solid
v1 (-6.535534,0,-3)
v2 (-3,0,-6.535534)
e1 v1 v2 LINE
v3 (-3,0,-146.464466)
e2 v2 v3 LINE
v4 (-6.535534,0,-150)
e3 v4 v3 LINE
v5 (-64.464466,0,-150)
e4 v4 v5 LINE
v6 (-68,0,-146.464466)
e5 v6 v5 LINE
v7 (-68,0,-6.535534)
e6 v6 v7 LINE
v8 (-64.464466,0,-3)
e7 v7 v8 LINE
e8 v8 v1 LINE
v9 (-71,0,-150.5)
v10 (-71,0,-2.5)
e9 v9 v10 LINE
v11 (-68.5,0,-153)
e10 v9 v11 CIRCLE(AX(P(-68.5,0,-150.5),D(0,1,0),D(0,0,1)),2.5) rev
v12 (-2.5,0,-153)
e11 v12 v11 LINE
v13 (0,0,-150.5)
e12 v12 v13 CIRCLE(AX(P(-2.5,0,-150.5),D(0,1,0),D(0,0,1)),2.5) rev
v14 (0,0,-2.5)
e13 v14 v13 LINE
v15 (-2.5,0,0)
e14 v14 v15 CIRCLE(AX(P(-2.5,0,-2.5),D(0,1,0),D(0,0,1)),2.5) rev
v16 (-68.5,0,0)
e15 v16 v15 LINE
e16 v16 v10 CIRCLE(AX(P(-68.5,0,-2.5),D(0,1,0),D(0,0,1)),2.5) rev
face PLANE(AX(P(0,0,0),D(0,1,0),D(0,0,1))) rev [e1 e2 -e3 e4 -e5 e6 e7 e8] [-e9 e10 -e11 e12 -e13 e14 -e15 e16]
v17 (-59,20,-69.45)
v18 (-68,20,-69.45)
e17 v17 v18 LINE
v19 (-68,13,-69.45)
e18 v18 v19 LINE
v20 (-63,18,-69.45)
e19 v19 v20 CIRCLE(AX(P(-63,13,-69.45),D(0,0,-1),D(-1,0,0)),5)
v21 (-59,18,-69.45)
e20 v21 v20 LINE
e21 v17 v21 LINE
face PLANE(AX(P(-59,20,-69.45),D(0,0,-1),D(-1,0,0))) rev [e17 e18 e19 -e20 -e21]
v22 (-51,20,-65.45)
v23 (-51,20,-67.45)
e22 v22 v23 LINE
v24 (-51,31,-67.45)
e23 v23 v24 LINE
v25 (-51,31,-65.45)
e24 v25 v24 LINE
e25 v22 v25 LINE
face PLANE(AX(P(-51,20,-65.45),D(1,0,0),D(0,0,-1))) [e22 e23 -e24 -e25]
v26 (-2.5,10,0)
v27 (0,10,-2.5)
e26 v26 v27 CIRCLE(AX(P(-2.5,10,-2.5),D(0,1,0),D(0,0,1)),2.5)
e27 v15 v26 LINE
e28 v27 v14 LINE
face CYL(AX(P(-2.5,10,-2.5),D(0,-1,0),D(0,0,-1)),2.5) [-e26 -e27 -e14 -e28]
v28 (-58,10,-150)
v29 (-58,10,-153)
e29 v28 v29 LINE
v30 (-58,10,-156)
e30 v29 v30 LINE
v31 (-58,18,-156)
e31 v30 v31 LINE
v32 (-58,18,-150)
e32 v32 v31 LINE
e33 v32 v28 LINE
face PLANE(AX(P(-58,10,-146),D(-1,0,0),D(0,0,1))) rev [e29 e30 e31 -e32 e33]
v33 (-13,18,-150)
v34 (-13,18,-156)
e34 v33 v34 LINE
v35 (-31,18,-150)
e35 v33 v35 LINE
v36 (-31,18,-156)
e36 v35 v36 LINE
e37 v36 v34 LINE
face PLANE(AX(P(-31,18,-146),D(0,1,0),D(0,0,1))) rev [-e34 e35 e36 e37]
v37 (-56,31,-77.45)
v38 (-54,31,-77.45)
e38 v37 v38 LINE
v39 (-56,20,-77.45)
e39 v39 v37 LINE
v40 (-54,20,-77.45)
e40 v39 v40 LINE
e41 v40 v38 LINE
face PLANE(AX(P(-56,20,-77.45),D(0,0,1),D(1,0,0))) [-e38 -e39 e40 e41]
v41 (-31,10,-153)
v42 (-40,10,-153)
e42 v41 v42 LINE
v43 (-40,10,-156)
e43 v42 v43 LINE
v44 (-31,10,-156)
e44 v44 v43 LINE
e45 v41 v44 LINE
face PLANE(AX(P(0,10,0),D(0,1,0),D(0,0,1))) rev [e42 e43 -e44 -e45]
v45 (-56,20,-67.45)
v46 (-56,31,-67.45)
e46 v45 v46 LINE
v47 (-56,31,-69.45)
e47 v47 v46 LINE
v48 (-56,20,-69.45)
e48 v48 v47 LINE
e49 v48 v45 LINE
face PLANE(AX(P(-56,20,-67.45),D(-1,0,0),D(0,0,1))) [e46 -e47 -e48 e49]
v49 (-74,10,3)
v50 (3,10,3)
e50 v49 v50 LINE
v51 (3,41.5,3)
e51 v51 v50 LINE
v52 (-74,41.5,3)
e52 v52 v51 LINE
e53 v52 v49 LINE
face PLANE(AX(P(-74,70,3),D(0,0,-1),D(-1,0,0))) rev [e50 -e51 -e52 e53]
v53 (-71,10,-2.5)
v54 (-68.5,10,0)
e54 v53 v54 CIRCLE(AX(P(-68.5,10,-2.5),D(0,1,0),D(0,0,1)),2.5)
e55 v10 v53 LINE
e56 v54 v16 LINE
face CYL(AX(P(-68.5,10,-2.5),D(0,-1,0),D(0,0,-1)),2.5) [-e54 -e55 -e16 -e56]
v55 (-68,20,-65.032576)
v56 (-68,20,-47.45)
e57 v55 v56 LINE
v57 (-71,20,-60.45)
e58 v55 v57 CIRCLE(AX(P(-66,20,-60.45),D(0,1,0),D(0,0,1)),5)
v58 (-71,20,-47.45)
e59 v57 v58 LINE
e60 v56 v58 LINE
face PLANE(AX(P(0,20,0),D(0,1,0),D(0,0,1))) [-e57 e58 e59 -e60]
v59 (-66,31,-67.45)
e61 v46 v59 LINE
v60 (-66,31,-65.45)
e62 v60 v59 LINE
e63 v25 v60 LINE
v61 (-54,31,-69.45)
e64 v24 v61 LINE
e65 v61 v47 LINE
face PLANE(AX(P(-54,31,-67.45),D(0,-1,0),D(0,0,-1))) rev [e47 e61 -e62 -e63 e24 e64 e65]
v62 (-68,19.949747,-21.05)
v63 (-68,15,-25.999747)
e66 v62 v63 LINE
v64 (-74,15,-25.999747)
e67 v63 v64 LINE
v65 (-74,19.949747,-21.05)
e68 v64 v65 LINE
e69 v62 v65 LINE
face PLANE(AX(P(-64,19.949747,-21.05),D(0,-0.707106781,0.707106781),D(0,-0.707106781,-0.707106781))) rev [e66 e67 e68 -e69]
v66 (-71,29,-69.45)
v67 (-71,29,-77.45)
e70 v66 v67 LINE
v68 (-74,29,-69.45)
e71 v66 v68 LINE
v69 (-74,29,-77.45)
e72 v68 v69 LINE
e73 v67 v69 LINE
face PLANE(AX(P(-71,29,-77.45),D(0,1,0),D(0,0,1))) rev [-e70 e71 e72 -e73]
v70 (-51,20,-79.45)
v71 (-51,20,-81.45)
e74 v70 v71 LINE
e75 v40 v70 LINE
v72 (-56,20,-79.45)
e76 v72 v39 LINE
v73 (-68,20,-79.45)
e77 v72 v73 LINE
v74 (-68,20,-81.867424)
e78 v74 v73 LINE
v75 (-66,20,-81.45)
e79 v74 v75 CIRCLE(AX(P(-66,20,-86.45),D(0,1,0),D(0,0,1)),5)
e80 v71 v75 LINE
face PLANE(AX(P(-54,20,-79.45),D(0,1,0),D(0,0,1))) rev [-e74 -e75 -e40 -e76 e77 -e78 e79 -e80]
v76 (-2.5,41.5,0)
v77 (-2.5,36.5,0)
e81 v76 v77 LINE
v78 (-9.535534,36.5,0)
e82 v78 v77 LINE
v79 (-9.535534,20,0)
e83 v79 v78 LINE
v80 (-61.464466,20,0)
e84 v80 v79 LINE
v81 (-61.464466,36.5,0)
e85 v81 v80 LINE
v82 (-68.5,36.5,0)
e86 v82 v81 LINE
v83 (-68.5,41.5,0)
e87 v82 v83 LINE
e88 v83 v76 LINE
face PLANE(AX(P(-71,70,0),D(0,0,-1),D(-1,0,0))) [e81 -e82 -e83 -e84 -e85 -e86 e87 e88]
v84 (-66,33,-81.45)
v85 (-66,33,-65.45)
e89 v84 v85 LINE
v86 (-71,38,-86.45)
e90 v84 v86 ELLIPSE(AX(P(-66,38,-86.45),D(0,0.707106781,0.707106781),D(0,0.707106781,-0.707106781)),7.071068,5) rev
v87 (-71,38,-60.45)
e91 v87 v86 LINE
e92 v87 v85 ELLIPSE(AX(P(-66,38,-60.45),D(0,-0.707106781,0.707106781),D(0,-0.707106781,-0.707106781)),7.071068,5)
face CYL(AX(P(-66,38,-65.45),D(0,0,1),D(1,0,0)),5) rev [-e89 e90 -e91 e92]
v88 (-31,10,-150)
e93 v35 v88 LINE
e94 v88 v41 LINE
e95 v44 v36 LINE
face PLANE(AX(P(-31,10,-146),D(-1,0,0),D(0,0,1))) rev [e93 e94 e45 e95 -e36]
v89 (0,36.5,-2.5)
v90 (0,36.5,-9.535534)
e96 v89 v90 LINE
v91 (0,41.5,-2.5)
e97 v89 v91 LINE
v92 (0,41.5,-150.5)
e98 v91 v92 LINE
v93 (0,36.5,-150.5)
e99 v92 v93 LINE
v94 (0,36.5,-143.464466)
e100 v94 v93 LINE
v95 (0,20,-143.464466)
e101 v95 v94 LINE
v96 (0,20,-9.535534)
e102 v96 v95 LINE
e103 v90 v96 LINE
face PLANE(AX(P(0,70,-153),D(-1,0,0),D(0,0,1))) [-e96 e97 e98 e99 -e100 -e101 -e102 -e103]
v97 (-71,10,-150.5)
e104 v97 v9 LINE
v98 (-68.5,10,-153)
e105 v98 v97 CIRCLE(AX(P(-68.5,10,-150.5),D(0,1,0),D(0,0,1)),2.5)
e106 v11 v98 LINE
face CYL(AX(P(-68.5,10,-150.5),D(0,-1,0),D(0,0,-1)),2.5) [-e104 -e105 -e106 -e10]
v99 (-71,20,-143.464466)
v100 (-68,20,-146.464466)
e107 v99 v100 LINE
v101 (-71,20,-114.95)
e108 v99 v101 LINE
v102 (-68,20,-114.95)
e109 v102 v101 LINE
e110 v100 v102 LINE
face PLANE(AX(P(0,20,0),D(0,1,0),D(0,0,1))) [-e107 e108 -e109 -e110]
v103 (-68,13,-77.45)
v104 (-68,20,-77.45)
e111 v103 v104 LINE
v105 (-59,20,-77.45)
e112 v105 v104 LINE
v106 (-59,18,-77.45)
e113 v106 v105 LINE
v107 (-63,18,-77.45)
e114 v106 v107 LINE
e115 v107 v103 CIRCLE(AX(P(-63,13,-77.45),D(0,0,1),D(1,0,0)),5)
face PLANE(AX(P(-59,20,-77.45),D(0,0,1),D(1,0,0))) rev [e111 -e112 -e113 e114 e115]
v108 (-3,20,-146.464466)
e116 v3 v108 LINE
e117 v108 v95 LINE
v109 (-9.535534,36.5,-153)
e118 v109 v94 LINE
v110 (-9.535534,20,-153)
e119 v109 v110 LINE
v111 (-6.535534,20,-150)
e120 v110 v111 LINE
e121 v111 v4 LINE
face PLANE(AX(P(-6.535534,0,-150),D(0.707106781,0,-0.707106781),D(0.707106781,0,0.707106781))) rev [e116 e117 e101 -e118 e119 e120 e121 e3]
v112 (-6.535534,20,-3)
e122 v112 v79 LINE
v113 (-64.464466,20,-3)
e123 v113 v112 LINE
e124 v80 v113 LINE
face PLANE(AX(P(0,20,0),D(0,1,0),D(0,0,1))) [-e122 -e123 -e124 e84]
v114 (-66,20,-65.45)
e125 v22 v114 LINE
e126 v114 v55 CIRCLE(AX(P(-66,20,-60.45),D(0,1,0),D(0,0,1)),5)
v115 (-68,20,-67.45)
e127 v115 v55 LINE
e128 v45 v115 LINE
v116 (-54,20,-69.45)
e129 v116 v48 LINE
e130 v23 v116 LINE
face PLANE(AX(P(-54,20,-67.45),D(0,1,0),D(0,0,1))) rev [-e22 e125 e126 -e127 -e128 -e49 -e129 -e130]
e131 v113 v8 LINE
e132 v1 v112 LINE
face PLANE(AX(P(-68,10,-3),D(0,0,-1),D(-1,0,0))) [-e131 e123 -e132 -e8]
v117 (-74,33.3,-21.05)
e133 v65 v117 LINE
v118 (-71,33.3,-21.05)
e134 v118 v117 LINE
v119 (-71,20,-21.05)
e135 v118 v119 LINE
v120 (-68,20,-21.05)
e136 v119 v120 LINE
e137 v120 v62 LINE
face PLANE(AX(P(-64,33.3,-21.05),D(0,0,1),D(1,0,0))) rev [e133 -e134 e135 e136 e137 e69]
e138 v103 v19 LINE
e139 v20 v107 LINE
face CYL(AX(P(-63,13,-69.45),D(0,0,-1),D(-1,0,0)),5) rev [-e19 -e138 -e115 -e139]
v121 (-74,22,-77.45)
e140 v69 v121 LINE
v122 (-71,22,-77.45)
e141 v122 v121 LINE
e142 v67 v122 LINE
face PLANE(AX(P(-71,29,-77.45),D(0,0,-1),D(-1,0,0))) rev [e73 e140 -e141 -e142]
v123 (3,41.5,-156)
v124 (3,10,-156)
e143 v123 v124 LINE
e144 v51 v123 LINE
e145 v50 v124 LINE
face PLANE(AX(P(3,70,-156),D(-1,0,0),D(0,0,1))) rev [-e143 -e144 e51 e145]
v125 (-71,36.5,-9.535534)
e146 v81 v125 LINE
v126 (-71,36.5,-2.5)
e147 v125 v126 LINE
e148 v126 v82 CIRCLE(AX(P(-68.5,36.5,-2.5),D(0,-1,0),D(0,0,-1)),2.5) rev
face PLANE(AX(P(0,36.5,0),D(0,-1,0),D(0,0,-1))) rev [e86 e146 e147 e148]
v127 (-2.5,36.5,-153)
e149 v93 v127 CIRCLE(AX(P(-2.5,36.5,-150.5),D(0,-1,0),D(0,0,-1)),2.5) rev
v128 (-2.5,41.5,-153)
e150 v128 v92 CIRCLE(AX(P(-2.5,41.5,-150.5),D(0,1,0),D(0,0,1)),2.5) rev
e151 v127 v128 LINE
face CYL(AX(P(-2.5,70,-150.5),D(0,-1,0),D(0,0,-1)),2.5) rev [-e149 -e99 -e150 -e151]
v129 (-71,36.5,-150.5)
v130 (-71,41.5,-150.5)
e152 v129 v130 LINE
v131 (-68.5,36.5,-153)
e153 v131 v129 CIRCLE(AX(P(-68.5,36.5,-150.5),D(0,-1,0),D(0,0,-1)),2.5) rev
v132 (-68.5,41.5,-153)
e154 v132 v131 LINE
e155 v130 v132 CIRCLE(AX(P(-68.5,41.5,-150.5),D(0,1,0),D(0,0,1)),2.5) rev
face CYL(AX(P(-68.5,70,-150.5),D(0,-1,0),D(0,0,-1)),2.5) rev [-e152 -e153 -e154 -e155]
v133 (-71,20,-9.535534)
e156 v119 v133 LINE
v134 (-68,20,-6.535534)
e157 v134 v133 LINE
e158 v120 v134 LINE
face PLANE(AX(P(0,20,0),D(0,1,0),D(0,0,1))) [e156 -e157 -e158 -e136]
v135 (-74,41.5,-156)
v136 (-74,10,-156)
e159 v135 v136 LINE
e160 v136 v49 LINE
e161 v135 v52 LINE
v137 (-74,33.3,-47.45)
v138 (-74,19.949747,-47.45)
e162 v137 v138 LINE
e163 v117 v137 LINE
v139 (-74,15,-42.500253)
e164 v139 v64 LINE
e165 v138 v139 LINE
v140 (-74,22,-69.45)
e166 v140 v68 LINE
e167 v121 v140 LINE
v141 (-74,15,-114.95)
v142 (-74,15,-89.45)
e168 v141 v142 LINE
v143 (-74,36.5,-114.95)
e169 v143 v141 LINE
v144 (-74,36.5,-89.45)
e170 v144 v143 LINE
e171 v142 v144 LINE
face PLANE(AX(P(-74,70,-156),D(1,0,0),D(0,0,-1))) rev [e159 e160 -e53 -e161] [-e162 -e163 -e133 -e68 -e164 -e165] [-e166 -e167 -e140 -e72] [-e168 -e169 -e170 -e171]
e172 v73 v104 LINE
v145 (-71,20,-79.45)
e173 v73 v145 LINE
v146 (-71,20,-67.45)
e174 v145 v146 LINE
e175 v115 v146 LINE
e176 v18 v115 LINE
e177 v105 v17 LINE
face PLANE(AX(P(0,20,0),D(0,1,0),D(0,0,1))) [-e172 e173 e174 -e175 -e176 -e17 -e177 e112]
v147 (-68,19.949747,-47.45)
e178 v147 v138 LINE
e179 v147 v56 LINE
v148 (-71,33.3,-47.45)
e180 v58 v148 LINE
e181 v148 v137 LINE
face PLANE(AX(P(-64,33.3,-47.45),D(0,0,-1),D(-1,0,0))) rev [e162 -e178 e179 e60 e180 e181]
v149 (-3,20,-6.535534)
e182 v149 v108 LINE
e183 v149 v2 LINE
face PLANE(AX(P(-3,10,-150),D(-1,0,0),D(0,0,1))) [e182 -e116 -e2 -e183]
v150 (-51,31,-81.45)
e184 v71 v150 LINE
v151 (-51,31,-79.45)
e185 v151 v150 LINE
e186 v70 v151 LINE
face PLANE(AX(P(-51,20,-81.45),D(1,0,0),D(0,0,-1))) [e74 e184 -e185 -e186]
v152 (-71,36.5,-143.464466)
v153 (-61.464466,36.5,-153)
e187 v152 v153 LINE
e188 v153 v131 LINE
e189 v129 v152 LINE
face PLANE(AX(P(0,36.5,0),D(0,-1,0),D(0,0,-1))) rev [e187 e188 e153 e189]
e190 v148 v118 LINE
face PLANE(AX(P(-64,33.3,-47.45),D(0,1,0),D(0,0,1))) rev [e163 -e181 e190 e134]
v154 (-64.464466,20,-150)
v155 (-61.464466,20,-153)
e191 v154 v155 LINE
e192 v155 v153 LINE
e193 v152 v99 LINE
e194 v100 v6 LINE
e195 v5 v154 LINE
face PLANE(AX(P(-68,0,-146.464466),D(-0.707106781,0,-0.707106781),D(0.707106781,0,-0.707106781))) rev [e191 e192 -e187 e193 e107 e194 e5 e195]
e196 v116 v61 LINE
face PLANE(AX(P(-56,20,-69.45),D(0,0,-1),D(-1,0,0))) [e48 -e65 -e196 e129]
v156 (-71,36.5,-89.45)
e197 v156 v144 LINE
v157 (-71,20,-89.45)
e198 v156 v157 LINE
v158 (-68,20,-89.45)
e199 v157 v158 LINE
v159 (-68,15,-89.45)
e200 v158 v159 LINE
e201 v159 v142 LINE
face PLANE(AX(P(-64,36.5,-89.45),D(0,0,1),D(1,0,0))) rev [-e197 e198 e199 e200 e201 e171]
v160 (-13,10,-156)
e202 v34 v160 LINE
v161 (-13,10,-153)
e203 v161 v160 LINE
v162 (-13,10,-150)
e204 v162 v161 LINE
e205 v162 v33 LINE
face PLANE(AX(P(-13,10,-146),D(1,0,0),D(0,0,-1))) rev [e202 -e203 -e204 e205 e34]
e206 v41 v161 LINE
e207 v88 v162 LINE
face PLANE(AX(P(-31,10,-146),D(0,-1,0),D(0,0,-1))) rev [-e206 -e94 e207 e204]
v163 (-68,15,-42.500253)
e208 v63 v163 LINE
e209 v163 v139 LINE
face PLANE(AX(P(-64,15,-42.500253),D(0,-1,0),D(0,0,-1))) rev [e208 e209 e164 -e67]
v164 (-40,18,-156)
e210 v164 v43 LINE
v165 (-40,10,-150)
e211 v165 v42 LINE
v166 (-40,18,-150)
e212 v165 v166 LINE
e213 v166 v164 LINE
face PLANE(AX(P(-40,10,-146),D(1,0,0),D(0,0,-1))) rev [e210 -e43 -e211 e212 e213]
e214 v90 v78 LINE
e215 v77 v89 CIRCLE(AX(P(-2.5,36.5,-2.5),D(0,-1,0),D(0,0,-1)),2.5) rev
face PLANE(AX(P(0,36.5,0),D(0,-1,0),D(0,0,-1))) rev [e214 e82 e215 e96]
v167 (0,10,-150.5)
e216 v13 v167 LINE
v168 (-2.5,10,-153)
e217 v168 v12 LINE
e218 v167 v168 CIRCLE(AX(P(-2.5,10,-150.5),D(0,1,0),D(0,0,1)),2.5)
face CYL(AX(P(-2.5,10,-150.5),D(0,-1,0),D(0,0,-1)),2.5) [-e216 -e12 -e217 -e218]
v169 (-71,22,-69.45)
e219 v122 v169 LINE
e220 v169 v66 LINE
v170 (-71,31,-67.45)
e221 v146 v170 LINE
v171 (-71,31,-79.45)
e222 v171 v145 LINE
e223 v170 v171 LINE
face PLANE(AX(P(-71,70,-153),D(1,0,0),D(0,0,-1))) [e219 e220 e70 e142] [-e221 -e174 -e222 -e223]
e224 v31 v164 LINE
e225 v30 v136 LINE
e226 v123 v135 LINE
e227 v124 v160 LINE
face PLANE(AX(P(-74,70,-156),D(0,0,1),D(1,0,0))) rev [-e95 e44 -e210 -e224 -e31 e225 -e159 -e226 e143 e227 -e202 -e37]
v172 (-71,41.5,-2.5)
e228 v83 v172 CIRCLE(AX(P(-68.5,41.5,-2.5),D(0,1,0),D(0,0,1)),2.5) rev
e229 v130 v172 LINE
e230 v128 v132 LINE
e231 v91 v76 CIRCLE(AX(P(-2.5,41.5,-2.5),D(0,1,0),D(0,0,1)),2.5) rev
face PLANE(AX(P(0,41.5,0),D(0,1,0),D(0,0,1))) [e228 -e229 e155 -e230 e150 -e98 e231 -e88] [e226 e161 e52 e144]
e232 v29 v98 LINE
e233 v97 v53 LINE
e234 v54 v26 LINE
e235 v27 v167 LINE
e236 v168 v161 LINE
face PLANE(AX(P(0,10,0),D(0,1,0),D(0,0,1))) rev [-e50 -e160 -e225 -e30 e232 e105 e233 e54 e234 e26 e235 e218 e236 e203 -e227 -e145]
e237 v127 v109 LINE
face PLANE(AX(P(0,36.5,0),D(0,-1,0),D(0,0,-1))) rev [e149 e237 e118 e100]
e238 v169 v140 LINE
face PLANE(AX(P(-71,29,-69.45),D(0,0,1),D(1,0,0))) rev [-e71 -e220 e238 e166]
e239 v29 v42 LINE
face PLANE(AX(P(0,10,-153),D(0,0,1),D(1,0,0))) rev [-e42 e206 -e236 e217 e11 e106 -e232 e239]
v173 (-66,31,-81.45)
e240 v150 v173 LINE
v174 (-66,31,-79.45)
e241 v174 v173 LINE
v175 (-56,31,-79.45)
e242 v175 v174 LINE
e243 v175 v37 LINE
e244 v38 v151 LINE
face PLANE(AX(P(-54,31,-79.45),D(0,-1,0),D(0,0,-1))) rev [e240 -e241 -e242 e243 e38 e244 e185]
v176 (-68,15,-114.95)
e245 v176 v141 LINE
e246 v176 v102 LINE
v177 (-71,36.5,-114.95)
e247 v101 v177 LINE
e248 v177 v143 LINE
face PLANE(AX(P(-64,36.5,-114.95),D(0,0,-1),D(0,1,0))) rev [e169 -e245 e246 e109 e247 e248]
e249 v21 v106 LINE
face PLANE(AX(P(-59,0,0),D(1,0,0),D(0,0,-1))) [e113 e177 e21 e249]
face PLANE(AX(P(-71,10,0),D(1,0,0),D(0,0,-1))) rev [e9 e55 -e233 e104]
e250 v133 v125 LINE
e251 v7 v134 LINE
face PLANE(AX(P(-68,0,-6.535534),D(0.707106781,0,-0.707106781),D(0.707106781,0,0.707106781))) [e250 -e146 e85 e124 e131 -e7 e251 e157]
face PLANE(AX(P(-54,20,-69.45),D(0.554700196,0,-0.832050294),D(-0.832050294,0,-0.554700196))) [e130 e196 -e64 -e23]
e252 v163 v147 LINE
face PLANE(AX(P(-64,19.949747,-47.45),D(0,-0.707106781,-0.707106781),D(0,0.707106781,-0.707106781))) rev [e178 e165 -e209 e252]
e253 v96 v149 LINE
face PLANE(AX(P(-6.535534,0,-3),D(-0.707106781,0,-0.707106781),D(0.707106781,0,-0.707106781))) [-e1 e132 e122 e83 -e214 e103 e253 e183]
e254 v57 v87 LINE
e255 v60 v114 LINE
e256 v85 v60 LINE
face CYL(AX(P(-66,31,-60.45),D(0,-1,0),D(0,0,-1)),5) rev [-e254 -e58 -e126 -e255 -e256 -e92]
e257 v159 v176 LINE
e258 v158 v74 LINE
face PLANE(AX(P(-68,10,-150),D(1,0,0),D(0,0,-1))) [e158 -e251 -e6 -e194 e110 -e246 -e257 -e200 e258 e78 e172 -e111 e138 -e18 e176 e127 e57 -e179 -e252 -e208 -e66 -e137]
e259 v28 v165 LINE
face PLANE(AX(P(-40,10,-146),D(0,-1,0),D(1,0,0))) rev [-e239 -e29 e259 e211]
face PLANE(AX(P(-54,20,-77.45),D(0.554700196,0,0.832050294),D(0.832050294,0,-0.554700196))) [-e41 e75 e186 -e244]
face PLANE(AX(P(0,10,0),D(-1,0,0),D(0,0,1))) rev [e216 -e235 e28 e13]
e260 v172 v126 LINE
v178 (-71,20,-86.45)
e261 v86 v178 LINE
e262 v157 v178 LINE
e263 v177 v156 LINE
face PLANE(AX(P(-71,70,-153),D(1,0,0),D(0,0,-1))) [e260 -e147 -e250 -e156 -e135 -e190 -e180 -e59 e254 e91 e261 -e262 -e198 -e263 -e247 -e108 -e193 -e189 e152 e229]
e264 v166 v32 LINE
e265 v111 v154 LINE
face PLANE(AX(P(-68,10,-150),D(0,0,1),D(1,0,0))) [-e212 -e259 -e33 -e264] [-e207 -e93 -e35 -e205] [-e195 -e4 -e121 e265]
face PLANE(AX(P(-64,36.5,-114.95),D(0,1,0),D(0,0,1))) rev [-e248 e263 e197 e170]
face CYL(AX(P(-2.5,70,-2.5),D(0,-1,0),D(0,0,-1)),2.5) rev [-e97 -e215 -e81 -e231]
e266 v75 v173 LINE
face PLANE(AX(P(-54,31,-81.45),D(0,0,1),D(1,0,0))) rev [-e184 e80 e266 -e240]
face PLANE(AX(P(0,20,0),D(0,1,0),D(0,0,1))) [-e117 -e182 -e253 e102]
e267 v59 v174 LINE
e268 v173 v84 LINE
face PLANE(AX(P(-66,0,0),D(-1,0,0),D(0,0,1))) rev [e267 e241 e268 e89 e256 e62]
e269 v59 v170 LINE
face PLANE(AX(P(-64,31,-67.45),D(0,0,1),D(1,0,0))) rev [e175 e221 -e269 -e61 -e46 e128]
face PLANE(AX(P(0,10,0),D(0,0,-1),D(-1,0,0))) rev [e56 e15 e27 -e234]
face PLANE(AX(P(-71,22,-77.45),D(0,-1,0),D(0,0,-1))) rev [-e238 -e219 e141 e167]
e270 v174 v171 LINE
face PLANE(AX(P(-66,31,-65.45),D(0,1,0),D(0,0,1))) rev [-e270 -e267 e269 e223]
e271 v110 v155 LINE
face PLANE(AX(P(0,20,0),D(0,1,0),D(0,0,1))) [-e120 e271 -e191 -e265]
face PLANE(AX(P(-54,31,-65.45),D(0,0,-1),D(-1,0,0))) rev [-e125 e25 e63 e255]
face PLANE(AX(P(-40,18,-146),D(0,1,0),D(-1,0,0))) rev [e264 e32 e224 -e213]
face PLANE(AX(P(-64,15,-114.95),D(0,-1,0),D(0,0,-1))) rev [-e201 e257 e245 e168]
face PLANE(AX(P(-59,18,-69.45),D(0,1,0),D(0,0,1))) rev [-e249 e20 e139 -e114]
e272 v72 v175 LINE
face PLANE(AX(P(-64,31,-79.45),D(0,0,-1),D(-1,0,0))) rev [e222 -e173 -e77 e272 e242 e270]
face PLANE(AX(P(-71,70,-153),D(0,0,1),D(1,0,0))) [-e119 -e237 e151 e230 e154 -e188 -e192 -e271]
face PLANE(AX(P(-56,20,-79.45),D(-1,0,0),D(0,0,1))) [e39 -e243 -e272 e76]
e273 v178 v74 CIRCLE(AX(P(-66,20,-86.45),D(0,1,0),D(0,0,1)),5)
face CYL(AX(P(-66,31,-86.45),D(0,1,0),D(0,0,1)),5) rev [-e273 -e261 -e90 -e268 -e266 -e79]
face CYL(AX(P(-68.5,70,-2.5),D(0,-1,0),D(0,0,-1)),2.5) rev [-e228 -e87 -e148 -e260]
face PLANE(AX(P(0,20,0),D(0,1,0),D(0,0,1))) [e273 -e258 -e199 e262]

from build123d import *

# Parameters (mm, degrees)
SKETCH1_W           = 71
SKETCH1_H           = 153
SKETCH1_W_2         = 65
SKETCH1_H_2         = 147
BOSS_EXTRUDE1_DEPTH = 10
SKETCH2_W           = 77
SKETCH2_H           = 159
SKETCH2_W_2         = 71
SKETCH2_H_2         = 153
BOSS_EXTRUDE2_DEPTH = 60
SKETCH3_W           = 71
SKETCH3_H           = 153
SKETCH3_W_2         = 65
SKETCH3_H_2         = 147
BOSS_EXTRUDE3_DEPTH = 10
RIB17_REACH         = 188.312
SKETCH7_WALL_W      = 379.62313401
SKETCH7_WALL_H      = 60
RIB22_REACH         = 188.312
SKETCH9_WALL_W      = 379.62313401
SKETCH9_WALL_H      = 60
RIB23_REACH         = 188.312
SKETCH10_WALL_W     = 379.62313401
SKETCH10_WALL_H     = 60
RIB24_REACH         = 188.312
SKETCH11_WALL_W     = 379.62313401
SKETCH11_WALL_H     = 60
FILLET1_R           = 2.5
FILLET2_R           = 3
SKETCH12_W          = 18
SKETCH12_H          = 8
CUT_EXTRUDE1_DEPTH  = 10
SKETCH13_W          = 12
SKETCH13_H          = 11
SKETCH13_W_2        = 25.5
SKETCH13_H_2        = 21.5
CUT_EXTRUDE2_DEPTH  = 10
SKETCH14_W          = 77
SKETCH14_H          = 159
CUT_EXTRUDE3_DEPTH  = 28.5
SKETCH15_W          = 71
SKETCH15_H          = 153
CUT_EXTRUDE4_DEPTH  = 5
FILLET3_R           = 2.5
SKETCH16_W          = 2
SKETCH16_H          = 11
BOSS_EXTRUDE4_DEPTH = 17
BOSS_EXTRUDE5_DEPTH = 11
SKETCH19_W          = 8
SKETCH19_H          = 2
BOSS_EXTRUDE7_DEPTH = 9
SKETCH20_W          = 8
SKETCH20_H          = 7
BOSS_EXTRUDE8_DEPTH = 3
SKETCH21_W          = 16
SKETCH21_H          = 2
BOSS_EXTRUDE9_DEPTH = 5
FILLET4_R           = 5


with BuildPart() as part:
    # Sketch1 → Boss-Extrude1 (new body)
    with BuildSketch(Plane(origin=(0, 0, 0), x_dir=(1, 0, 0), z_dir=(0, 1, 0))):
        with Locations((-35.5, 76.5)):
            Rectangle(SKETCH1_W, SKETCH1_H)
        with Locations((-35.5, 76.5)):
            Rectangle(SKETCH1_W_2, SKETCH1_H_2, mode=Mode.SUBTRACT)
    extrude(amount=BOSS_EXTRUDE1_DEPTH)



with BuildPart() as body_2:
    # Sketch2 → Boss-Extrude2 (new body)
    with BuildSketch(Plane(origin=(0, 10, 0), x_dir=(1, 0, 0), z_dir=(0, 1, 0))):
        with Locations((-35.5, 76.5)):
            Rectangle(SKETCH2_W, SKETCH2_H)
        with Locations((-35.5, 76.5)):
            Rectangle(SKETCH2_W_2, SKETCH2_H_2, mode=Mode.SUBTRACT)
    extrude(amount=BOSS_EXTRUDE2_DEPTH)


with BuildPart() as part_1:
    add(part.part)

    add(body_2.part)  # Boss-Extrude3 merges body 2
    # Sketch3 → Boss-Extrude3 (add)
    with BuildSketch(Plane(origin=(0, 10, 0), x_dir=(1, 0, 0), z_dir=(0, 1, 0))):
        with Locations((-35.5, 76.5)):
            Rectangle(SKETCH3_W, SKETCH3_H)
        with Locations((-35.5, 76.5)):
            Rectangle(SKETCH3_W_2, SKETCH3_H_2, mode=Mode.SUBTRACT)
    extrude(amount=BOSS_EXTRUDE3_DEPTH)

    # Sketch7 wall → Rib17 (add, up to next)
    with BuildSketch(Plane(origin=(-66.232233047, 0, -4.767766953), x_dir=(0.707106781187, 0, 0.707106781187), z_dir=(-0.707106781187, 0, 0.707106781187)), mode=Mode.PRIVATE) as rib17_sk1:
        with Locations((0, 30)):
            Rectangle(SKETCH7_WALL_W, SKETCH7_WALL_H)
    rib17_tool1 = extrude(rib17_sk1.sketch, amount=RIB17_REACH, mode=Mode.PRIVATE) - part_1.part
    add(rib17_tool1.solids().sort_by_distance((-66.232233047, 0, -4.767766953))[0])

    # Sketch9 wall → Rib22 (add, up to next)
    with BuildSketch(Plane(origin=(-66.232233047, 0, -148.232233047), x_dir=(0.707106781187, 0, -0.707106781187), z_dir=(0.707106781187, 0, 0.707106781187)), mode=Mode.PRIVATE) as rib22_sk1:
        with Locations((0, 30)):
            Rectangle(SKETCH9_WALL_W, SKETCH9_WALL_H)
    rib22_tool1 = extrude(rib22_sk1.sketch, amount=-RIB22_REACH, mode=Mode.PRIVATE) - part_1.part
    add(rib22_tool1.solids().sort_by_distance((-66.232233047, 0, -148.232233047))[0])

    # Sketch10 wall → Rib23 (add, up to next)
    with BuildSketch(Plane(origin=(-4.767766953, 0, -148.232233047), x_dir=(0.707106781187, 0, 0.707106781187), z_dir=(-0.707106781187, 0, 0.707106781187)), mode=Mode.PRIVATE) as rib23_sk1:
        with Locations((0, 30)):
            Rectangle(SKETCH10_WALL_W, SKETCH10_WALL_H)
    rib23_tool1 = extrude(rib23_sk1.sketch, amount=-RIB23_REACH, mode=Mode.PRIVATE) - part_1.part
    add(rib23_tool1.solids().sort_by_distance((-4.767766953, 0, -148.232233047))[0])

    # Sketch11 wall → Rib24 (add, up to next)
    with BuildSketch(Plane(origin=(-4.767766953, 0, -4.767766953), x_dir=(0.707106781187, 0, -0.707106781187), z_dir=(0.707106781187, 0, 0.707106781187)), mode=Mode.PRIVATE) as rib24_sk1:
        with Locations((0, 30)):
            Rectangle(SKETCH11_WALL_W, SKETCH11_WALL_H)
    rib24_tool1 = extrude(rib24_sk1.sketch, amount=RIB24_REACH, mode=Mode.PRIVATE) - part_1.part
    add(rib24_tool1.solids().sort_by_distance((-4.767766953, 0, -4.767766953))[0])

    # Fillet1
    fillet1_edges = [part_1.edges().sort_by_distance(p)[0] for p in [
        (0, 5, 0),
        (-71, 5, 0),
        (-71, 5, -153),
        (0, 5, -153),
    ]]
    fillet(fillet1_edges, radius=FILLET1_R)

    # Fillet2
    fillet2_edges = [part_1.edges().sort_by_distance(p)[0] for p in [
        (-71, 65, 0),
        (0, 65, 0),
        (0, 65, -153),
        (-71, 65, -153),
    ]]
    fillet(fillet2_edges, radius=FILLET2_R)

    # Sketch12 → Cut-Extrude1 (cut)
    with BuildSketch(Plane(origin=(0, 0, -156), x_dir=(-1, 0, 0), z_dir=(0, 0, -1))):
        with Locations((22, 14)):
            Rectangle(SKETCH12_W, SKETCH12_H)
        with Locations((49, 14)):
            Rectangle(SKETCH12_W, SKETCH12_H)
    extrude(amount=-CUT_EXTRUDE1_DEPTH, mode=Mode.SUBTRACT)

    # Sketch13 → Cut-Extrude2 (cut)
    with BuildSketch(Plane.ZY.offset(74)):
        Polygon((-47.45, 19.949747468), (-42.500252532, 15), (-25.999747468, 15), (-21.05, 19.949747468), (-21.05, 33.3), (-47.45, 33.3), align=None)
        with Locations((-73.45, 25.5)):
            Rectangle(SKETCH13_W, SKETCH13_H)
        with Locations((-102.2, 25.75)):
            Rectangle(SKETCH13_W_2, SKETCH13_H_2)
    extrude(amount=-CUT_EXTRUDE2_DEPTH, mode=Mode.SUBTRACT)

    # Sketch14 → Cut-Extrude3 (cut)
    with BuildSketch(Plane(origin=(0, 70, 0), x_dir=(1, 0, 0), z_dir=(0, 1, 0))):
        with Locations((-35.5, 76.5)):
            Rectangle(SKETCH14_W, SKETCH14_H)
    extrude(amount=-CUT_EXTRUDE3_DEPTH, mode=Mode.SUBTRACT)

    # Sketch15 → Cut-Extrude4 (cut)
    with BuildSketch(Plane(origin=(0, 41.5, 0), x_dir=(1, 0, 0), z_dir=(0, 1, 0))):
        with Locations((-35.5, 76.5)):
            Rectangle(SKETCH15_W, SKETCH15_H)
    extrude(amount=-CUT_EXTRUDE4_DEPTH, mode=Mode.SUBTRACT)

    # Fillet3
    fillet3_edges = [part_1.edges().sort_by_distance(p)[0] for p in [
        (-71, 39, 0),
        (-71, 39, -153),
        (0, 39, -153),
        (0, 39, 0),
    ]]
    fillet(fillet3_edges, radius=FILLET3_R)

    # Sketch16 → Boss-Extrude4 (add)
    with BuildSketch(Plane(origin=(-71, 0, 0), x_dir=(0, 0, -1), z_dir=(1, 0, 0))):
        with Locations((66.45, 25.5)):
            Rectangle(SKETCH16_W, SKETCH16_H)
        with Locations((80.45, 25.5)):
            Rectangle(SKETCH16_W, SKETCH16_H)
    extrude(amount=BOSS_EXTRUDE4_DEPTH)

    # Sketch17 → Boss-Extrude5 (add)
    with BuildSketch(Plane(origin=(0, 31, 0), x_dir=(1, 0, 0), z_dir=(0, 1, 0))):
        Polygon((-54, 79.45), (-56, 79.45), (-56, 77.45), (-54, 77.45), (-51, 79.45), (-51, 81.45), (-54, 81.45), align=None)
        Polygon((-56, 67.45), (-56, 69.45), (-54, 69.45), (-51, 67.45), (-51, 65.45), (-54, 65.45), (-54, 67.45), align=None)
    extrude(amount=-BOSS_EXTRUDE5_DEPTH)

    # Sketch19 → Boss-Extrude7 (add)
    with BuildSketch(Plane(origin=(-68, 0, 0), x_dir=(0, 0, -1), z_dir=(1, 0, 0))):
        with Locations((73.45, 19)):
            Rectangle(SKETCH19_W, SKETCH19_H)
    extrude(amount=BOSS_EXTRUDE7_DEPTH)

    # Sketch20 → Boss-Extrude8 (add)
    with BuildSketch(Plane.ZY.offset(74)):
        Polygon((-79.45, 31), (-77.45, 31), (-69.45, 31), (-67.45, 31), (-67.45, 20), (-69.45, 20), (-77.45, 20), (-79.45, 20), align=None)
        with Locations((-73.45, 25.5)):
            Rectangle(SKETCH20_W, SKETCH20_H, mode=Mode.SUBTRACT)
    extrude(amount=-BOSS_EXTRUDE8_DEPTH)

    # Sketch21 → Boss-Extrude9 (add)
    with BuildSketch(Plane(origin=(-71, 0, 0), x_dir=(0, 0, -1), z_dir=(1, 0, 0))):
        with Locations((73.45, 32)):
            Rectangle(SKETCH21_W, SKETCH21_H)
    extrude(amount=BOSS_EXTRUDE9_DEPTH)

    # Fillet4
    # the kernel refuses this fillet: 5 mm, written as the material it adds along each edge
    with BuildSketch(Plane(origin=(-68, 18, -77.45), x_dir=(0, -1, 0), z_dir=(0, 0, 1))) as fillet4_piece_1:
        with BuildLine():
            CenterArc((FILLET4_R, FILLET4_R), FILLET4_R, 180, 90)
            Line((0, FILLET4_R), (-FILLET4_R * 0.02, FILLET4_R))
            Line((-FILLET4_R * 0.02, FILLET4_R), (-FILLET4_R * 0.02, -FILLET4_R * 0.02))
            Line((-FILLET4_R * 0.02, -FILLET4_R * 0.02), (FILLET4_R, -FILLET4_R * 0.02))
            Line((FILLET4_R, -FILLET4_R * 0.02), (FILLET4_R, 0))
        make_face()
    extrude(amount=8)
    with BuildSketch(Plane(origin=(-71, 33, -81.45), x_dir=(0, 1, 0), z_dir=(0, 0, 1))) as fillet4_piece_2:
        with BuildLine():
            CenterArc((FILLET4_R, -FILLET4_R), FILLET4_R, 90, 90)
            Line((0, -FILLET4_R), (-FILLET4_R * 0.02, -FILLET4_R))
            Line((-FILLET4_R * 0.02, -FILLET4_R), (-FILLET4_R * 0.02, FILLET4_R * 0.02))
            Line((-FILLET4_R * 0.02, FILLET4_R * 0.02), (FILLET4_R, FILLET4_R * 0.02))
            Line((FILLET4_R, FILLET4_R * 0.02), (FILLET4_R, 0))
        make_face()
    extrude(amount=16)
    with BuildSketch(Plane(origin=(-71, 33, -81.45), x_dir=(0, 0, -1), z_dir=(0, -1, 0)), Plane(origin=(-71, 20, -65.45), x_dir=(0, 0, 1), z_dir=(0, 1, 0))) as fillet4_piece_3:
        with BuildLine():
            CenterArc((FILLET4_R, FILLET4_R), FILLET4_R, 180, 90)
            Line((0, FILLET4_R), (-FILLET4_R * 0.02, FILLET4_R))
            Line((-FILLET4_R * 0.02, FILLET4_R), (-FILLET4_R * 0.02, -FILLET4_R * 0.02))
            Line((-FILLET4_R * 0.02, -FILLET4_R * 0.02), (FILLET4_R, -FILLET4_R * 0.02))
            Line((FILLET4_R, -FILLET4_R * 0.02), (FILLET4_R, 0))
        make_face()
    extrude(amount=13)
    with BuildSketch(Plane(origin=(-71, 45.5, -81.45), x_dir=(0, 0, -1), z_dir=(0, -1, 0))) as fillet4_piece_4a_section:
        with BuildLine():
            CenterArc((FILLET4_R, FILLET4_R), FILLET4_R, 180, 90)
            Line((0, FILLET4_R), (-FILLET4_R * 0.02, FILLET4_R))
            Line((-FILLET4_R * 0.02, FILLET4_R), (-FILLET4_R * 0.02, -FILLET4_R * 0.02))
            Line((-FILLET4_R * 0.02, -FILLET4_R * 0.02), (FILLET4_R, -FILLET4_R * 0.02))
            Line((FILLET4_R, -FILLET4_R * 0.02), (FILLET4_R, 0))
        make_face()
    fillet4_piece_4a = extrude(amount=25.5, mode=Mode.PRIVATE)
    fillet4_piece_4a = split(fillet4_piece_4a, bisect_by=Plane(origin=(-69.868024429, 33, -82.581975571), z_dir=(0, 1, 0)), keep=Keep.TOP, mode=Mode.PRIVATE)
    with BuildSketch(Plane(origin=(-71, 33, -93.95), x_dir=(0, 1, 0), z_dir=(0, 0, 1))) as fillet4_piece_4b_section:
        with BuildLine():
            CenterArc((FILLET4_R, -FILLET4_R), FILLET4_R, 90, 90)
            Line((0, -FILLET4_R), (-FILLET4_R * 0.02, -FILLET4_R))
            Line((-FILLET4_R * 0.02, -FILLET4_R), (-FILLET4_R * 0.02, FILLET4_R * 0.02))
            Line((-FILLET4_R * 0.02, FILLET4_R * 0.02), (FILLET4_R, FILLET4_R * 0.02))
            Line((FILLET4_R, FILLET4_R * 0.02), (FILLET4_R, 0))
        make_face()
    fillet4_piece_4b = extrude(amount=28.5, mode=Mode.PRIVATE)
    fillet4_piece_4b = split(fillet4_piece_4b, bisect_by=Plane(origin=(-69.868024429, 34.131975571, -81.45), z_dir=(0, 0, -1)), keep=Keep.TOP, mode=Mode.PRIVATE)
    fillet4_piece_4 = fillet4_piece_4a & fillet4_piece_4b
    add(fillet4_piece_4)
    with BuildSketch(Plane(origin=(-71, 33, -81.45), x_dir=(0, 1, 0), z_dir=(0, 0, 1))) as fillet4_piece_5a_section:
        with BuildLine():
            CenterArc((FILLET4_R, -FILLET4_R), FILLET4_R, 90, 90)
            Line((0, -FILLET4_R), (-FILLET4_R * 0.02, -FILLET4_R))
            Line((-FILLET4_R * 0.02, -FILLET4_R), (-FILLET4_R * 0.02, FILLET4_R * 0.02))
            Line((-FILLET4_R * 0.02, FILLET4_R * 0.02), (FILLET4_R, FILLET4_R * 0.02))
            Line((FILLET4_R, FILLET4_R * 0.02), (FILLET4_R, 0))
        make_face()
    fillet4_piece_5a = extrude(amount=28.5, mode=Mode.PRIVATE)
    fillet4_piece_5a = split(fillet4_piece_5a, bisect_by=Plane(origin=(-69.868024429, 34.131975571, -65.45), z_dir=(0, 0, 1)), keep=Keep.TOP, mode=Mode.PRIVATE)
    with BuildSketch(Plane(origin=(-71, 20, -65.45), x_dir=(0, 0, 1), z_dir=(0, 1, 0))) as fillet4_piece_5b_section:
        with BuildLine():
            CenterArc((FILLET4_R, FILLET4_R), FILLET4_R, 180, 90)
            Line((0, FILLET4_R), (-FILLET4_R * 0.02, FILLET4_R))
            Line((-FILLET4_R * 0.02, FILLET4_R), (-FILLET4_R * 0.02, -FILLET4_R * 0.02))
            Line((-FILLET4_R * 0.02, -FILLET4_R * 0.02), (FILLET4_R, -FILLET4_R * 0.02))
            Line((FILLET4_R, -FILLET4_R * 0.02), (FILLET4_R, 0))
        make_face()
    fillet4_piece_5b = extrude(amount=25.5, mode=Mode.PRIVATE)
    fillet4_piece_5b = split(fillet4_piece_5b, bisect_by=Plane(origin=(-69.868024429, 33, -64.318024429), z_dir=(0, 1, 0)), keep=Keep.TOP, mode=Mode.PRIVATE)
    fillet4_piece_5 = fillet4_piece_5a & fillet4_piece_5b
    add(fillet4_piece_5)


solid = part_1.part
